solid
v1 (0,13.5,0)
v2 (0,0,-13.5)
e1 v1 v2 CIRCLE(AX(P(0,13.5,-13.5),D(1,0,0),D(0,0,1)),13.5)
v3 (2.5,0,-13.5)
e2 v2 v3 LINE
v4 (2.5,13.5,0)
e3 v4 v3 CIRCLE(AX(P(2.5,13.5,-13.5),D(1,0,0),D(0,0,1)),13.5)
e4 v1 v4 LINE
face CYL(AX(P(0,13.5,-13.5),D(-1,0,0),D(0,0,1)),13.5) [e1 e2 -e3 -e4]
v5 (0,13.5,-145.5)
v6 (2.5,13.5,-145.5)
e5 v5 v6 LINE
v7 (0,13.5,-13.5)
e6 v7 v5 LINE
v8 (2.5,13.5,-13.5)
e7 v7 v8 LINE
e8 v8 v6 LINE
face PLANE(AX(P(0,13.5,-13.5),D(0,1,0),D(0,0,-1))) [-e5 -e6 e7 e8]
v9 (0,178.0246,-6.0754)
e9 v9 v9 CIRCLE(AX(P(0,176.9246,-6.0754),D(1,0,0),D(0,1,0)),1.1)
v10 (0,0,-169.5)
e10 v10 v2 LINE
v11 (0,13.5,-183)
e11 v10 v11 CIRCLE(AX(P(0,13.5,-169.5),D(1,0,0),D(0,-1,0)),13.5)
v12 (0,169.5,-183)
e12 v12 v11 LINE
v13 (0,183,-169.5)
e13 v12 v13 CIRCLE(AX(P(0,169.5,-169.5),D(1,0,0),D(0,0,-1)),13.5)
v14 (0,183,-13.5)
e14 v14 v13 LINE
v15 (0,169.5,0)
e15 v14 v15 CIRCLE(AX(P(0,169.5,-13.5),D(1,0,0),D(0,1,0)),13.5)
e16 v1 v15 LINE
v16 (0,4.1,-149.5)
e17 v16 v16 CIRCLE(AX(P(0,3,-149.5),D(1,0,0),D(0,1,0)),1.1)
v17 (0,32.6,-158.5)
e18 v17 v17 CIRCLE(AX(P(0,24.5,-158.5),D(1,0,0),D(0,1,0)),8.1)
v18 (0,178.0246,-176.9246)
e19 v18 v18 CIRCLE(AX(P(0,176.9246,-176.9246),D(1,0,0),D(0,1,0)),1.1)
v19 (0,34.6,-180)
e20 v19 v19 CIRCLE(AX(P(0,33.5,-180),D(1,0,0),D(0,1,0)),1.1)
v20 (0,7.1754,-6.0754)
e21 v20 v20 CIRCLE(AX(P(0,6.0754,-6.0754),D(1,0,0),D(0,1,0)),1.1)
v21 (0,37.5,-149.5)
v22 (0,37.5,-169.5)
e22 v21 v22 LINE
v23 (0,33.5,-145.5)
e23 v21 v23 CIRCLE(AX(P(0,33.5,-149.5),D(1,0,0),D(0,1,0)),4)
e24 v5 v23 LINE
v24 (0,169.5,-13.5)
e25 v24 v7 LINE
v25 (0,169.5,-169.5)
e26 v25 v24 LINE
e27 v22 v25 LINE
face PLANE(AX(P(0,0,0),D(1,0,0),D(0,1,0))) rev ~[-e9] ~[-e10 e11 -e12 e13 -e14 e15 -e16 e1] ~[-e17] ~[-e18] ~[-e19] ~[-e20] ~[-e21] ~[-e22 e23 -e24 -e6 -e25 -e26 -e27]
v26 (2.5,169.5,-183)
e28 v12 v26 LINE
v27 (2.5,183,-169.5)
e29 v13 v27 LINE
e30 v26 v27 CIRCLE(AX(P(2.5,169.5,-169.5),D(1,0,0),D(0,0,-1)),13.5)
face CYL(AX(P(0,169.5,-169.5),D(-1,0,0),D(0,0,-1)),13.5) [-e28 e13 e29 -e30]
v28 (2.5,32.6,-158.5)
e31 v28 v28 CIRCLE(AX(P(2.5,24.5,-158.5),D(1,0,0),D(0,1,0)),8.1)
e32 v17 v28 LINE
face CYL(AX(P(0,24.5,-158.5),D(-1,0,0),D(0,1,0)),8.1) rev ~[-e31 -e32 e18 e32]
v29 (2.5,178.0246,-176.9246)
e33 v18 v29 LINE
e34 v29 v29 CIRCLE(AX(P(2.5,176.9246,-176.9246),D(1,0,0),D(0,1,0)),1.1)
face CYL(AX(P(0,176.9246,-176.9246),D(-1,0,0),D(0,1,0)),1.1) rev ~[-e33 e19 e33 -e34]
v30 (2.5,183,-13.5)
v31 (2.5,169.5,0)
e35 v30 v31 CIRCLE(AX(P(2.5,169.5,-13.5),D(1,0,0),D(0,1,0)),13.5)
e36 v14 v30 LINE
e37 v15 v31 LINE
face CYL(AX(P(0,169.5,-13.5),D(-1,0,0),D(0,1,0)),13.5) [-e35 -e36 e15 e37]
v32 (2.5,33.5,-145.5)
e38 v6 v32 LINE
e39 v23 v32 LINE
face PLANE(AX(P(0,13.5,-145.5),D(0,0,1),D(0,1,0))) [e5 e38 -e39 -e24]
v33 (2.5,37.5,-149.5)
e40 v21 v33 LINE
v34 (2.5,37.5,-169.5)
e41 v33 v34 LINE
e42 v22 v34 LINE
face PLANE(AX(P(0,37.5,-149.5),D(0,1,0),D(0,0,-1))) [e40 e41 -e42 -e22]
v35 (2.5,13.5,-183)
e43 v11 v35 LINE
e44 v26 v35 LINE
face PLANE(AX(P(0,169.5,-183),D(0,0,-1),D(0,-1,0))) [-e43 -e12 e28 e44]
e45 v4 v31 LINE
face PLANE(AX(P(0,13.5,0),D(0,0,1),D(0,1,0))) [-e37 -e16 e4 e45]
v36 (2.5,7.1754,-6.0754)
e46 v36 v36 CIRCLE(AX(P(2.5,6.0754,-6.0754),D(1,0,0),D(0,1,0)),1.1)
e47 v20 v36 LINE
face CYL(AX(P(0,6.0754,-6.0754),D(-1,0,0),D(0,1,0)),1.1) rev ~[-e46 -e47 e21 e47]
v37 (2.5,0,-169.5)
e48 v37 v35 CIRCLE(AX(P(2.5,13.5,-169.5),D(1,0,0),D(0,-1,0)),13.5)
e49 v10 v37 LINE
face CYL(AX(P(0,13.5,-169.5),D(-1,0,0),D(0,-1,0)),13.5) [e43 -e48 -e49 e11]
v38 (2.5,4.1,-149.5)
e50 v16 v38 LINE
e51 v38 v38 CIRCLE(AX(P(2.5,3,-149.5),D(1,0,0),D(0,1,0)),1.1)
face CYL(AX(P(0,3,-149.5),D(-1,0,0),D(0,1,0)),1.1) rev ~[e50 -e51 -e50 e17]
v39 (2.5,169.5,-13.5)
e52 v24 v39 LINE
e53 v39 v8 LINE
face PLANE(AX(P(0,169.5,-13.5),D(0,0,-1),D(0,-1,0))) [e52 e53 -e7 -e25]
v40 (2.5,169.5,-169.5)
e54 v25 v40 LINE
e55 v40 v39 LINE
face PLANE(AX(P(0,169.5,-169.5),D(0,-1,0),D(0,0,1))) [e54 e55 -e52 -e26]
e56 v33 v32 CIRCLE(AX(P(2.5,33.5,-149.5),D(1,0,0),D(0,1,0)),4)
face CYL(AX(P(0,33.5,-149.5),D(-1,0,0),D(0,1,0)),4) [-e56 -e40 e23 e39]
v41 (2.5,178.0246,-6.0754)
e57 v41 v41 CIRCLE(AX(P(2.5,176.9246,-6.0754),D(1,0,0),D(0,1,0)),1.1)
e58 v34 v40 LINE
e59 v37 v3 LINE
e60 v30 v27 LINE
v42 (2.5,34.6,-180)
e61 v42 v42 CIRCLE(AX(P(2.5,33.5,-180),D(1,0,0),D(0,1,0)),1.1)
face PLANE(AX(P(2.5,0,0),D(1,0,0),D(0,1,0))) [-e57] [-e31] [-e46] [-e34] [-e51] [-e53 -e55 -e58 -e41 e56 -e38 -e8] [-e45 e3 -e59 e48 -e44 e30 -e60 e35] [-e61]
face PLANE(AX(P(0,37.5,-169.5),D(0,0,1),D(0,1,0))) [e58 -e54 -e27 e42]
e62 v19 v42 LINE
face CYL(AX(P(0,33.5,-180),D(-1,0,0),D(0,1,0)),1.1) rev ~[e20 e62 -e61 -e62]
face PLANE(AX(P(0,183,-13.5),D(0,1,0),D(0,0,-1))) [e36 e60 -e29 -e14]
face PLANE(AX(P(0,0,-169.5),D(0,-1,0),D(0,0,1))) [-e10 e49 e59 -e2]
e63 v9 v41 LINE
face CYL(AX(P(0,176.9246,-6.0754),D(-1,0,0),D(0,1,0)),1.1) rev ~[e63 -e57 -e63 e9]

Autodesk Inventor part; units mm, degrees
ref_plane "YZ Plane" through (0, 0, 0) normal (1, 0, 0) x (0, 1, 0)
ref_plane "XZ Plane" through (0, 0, 0) normal (0, 1, 0) x (-1, 0, 0)
ref_plane "XY Plane" through (0, 0, 0) normal (0, 0, 1) x (1, 0, 0)
sketch "Sketch1" plane through (0, 0, 0) normal (1, 0, 0) x (0, 1, 0)
  line L0 (13.5, 0) -> (169.5, 0)
  line L1 (183, -13.5) -> (183, -169.5)
  line L2 (169.5, -183) -> (13.5, -183)
  line L3 (0, -169.5) -> (0, -13.5)
  arc A0 (183, -13.5) -> (169.5, 0) centre (169.5, -13.5) ccw
  arc A1 (169.5, -183) -> (183, -169.5) centre (169.5, -169.5) ccw
  arc A2 (0, -169.5) -> (13.5, -183) centre (13.5, -169.5) ccw
  arc A3 (13.5, 0) -> (0, -13.5) centre (13.5, -13.5) ccw
  line L4 (169.5, -13.5) -> (13.5, -13.5)
  line L5 (13.5, -13.5) -> (13.5, -145.5)
  line L6 (37.5, -169.5) -> (169.5, -169.5)
  line L7 (169.5, -169.5) -> (169.5, -13.5)
  line L8 (169.5, -13.5) -> (179.0459, -3.9541) construction
  line L9 (169.5, -169.5) -> (179.0459, -179.0459) construction
  line L10 (13.5, -13.5) -> (3.9541, -3.9541) construction
  line L11 (33.0959, -149.5) -> (0, -149.5) construction
  line L12 (33.5, -149.9041) -> (33.5, -183) construction
  circle A4 centre (6.0754, -6.0754) radius 3 construction
  circle A5 centre (6.0754, -6.0754) radius 1.1
  circle A6 centre (176.9246, -6.0754) radius 3 construction
  circle A7 centre (176.9246, -6.0754) radius 1.1
  circle A8 centre (176.9246, -176.9246) radius 3 construction
  circle A9 centre (176.9246, -176.9246) radius 1.1
  circle A10 centre (33.5, -180) radius 3 construction
  circle A11 centre (33.5, -180) radius 1.1
  circle A12 centre (3, -149.5) radius 3 construction
  circle A13 centre (3, -149.5) radius 1.1
  line L13 (13.5, -169.5) -> (24.5, -158.5) construction
  circle A14 centre (24.5, -158.5) radius 8.1
  line L14 (13.5, -145.5) -> (33.5, -145.5)
  line L15 (37.5, -149.5) -> (37.5, -169.5)
  arc A15 (37.5, -149.5) -> (33.5, -145.5) centre (33.5, -149.5) ccw
  point P0 (0, 0)
  point P1 (37.5, -145.5)
  dimension "d6" = 6
  dimension "d0" = 13.5
  dimension "d1" = 183
  dimension "d2" = 183
  dimension "d3" = 20
  dimension "d4" = 20
  dimension "d5" = 2.2
  dimension "d10" = 16.2
  dimension "d11" = 24.5
  dimension "d12" = 45
  dimension "d13" = 24
  dimension "d14" = 4
extrude "Extrusion1" add sketch "Sketch1" along normal blind 2.5
properties part number "FrontPanelSquishything"
